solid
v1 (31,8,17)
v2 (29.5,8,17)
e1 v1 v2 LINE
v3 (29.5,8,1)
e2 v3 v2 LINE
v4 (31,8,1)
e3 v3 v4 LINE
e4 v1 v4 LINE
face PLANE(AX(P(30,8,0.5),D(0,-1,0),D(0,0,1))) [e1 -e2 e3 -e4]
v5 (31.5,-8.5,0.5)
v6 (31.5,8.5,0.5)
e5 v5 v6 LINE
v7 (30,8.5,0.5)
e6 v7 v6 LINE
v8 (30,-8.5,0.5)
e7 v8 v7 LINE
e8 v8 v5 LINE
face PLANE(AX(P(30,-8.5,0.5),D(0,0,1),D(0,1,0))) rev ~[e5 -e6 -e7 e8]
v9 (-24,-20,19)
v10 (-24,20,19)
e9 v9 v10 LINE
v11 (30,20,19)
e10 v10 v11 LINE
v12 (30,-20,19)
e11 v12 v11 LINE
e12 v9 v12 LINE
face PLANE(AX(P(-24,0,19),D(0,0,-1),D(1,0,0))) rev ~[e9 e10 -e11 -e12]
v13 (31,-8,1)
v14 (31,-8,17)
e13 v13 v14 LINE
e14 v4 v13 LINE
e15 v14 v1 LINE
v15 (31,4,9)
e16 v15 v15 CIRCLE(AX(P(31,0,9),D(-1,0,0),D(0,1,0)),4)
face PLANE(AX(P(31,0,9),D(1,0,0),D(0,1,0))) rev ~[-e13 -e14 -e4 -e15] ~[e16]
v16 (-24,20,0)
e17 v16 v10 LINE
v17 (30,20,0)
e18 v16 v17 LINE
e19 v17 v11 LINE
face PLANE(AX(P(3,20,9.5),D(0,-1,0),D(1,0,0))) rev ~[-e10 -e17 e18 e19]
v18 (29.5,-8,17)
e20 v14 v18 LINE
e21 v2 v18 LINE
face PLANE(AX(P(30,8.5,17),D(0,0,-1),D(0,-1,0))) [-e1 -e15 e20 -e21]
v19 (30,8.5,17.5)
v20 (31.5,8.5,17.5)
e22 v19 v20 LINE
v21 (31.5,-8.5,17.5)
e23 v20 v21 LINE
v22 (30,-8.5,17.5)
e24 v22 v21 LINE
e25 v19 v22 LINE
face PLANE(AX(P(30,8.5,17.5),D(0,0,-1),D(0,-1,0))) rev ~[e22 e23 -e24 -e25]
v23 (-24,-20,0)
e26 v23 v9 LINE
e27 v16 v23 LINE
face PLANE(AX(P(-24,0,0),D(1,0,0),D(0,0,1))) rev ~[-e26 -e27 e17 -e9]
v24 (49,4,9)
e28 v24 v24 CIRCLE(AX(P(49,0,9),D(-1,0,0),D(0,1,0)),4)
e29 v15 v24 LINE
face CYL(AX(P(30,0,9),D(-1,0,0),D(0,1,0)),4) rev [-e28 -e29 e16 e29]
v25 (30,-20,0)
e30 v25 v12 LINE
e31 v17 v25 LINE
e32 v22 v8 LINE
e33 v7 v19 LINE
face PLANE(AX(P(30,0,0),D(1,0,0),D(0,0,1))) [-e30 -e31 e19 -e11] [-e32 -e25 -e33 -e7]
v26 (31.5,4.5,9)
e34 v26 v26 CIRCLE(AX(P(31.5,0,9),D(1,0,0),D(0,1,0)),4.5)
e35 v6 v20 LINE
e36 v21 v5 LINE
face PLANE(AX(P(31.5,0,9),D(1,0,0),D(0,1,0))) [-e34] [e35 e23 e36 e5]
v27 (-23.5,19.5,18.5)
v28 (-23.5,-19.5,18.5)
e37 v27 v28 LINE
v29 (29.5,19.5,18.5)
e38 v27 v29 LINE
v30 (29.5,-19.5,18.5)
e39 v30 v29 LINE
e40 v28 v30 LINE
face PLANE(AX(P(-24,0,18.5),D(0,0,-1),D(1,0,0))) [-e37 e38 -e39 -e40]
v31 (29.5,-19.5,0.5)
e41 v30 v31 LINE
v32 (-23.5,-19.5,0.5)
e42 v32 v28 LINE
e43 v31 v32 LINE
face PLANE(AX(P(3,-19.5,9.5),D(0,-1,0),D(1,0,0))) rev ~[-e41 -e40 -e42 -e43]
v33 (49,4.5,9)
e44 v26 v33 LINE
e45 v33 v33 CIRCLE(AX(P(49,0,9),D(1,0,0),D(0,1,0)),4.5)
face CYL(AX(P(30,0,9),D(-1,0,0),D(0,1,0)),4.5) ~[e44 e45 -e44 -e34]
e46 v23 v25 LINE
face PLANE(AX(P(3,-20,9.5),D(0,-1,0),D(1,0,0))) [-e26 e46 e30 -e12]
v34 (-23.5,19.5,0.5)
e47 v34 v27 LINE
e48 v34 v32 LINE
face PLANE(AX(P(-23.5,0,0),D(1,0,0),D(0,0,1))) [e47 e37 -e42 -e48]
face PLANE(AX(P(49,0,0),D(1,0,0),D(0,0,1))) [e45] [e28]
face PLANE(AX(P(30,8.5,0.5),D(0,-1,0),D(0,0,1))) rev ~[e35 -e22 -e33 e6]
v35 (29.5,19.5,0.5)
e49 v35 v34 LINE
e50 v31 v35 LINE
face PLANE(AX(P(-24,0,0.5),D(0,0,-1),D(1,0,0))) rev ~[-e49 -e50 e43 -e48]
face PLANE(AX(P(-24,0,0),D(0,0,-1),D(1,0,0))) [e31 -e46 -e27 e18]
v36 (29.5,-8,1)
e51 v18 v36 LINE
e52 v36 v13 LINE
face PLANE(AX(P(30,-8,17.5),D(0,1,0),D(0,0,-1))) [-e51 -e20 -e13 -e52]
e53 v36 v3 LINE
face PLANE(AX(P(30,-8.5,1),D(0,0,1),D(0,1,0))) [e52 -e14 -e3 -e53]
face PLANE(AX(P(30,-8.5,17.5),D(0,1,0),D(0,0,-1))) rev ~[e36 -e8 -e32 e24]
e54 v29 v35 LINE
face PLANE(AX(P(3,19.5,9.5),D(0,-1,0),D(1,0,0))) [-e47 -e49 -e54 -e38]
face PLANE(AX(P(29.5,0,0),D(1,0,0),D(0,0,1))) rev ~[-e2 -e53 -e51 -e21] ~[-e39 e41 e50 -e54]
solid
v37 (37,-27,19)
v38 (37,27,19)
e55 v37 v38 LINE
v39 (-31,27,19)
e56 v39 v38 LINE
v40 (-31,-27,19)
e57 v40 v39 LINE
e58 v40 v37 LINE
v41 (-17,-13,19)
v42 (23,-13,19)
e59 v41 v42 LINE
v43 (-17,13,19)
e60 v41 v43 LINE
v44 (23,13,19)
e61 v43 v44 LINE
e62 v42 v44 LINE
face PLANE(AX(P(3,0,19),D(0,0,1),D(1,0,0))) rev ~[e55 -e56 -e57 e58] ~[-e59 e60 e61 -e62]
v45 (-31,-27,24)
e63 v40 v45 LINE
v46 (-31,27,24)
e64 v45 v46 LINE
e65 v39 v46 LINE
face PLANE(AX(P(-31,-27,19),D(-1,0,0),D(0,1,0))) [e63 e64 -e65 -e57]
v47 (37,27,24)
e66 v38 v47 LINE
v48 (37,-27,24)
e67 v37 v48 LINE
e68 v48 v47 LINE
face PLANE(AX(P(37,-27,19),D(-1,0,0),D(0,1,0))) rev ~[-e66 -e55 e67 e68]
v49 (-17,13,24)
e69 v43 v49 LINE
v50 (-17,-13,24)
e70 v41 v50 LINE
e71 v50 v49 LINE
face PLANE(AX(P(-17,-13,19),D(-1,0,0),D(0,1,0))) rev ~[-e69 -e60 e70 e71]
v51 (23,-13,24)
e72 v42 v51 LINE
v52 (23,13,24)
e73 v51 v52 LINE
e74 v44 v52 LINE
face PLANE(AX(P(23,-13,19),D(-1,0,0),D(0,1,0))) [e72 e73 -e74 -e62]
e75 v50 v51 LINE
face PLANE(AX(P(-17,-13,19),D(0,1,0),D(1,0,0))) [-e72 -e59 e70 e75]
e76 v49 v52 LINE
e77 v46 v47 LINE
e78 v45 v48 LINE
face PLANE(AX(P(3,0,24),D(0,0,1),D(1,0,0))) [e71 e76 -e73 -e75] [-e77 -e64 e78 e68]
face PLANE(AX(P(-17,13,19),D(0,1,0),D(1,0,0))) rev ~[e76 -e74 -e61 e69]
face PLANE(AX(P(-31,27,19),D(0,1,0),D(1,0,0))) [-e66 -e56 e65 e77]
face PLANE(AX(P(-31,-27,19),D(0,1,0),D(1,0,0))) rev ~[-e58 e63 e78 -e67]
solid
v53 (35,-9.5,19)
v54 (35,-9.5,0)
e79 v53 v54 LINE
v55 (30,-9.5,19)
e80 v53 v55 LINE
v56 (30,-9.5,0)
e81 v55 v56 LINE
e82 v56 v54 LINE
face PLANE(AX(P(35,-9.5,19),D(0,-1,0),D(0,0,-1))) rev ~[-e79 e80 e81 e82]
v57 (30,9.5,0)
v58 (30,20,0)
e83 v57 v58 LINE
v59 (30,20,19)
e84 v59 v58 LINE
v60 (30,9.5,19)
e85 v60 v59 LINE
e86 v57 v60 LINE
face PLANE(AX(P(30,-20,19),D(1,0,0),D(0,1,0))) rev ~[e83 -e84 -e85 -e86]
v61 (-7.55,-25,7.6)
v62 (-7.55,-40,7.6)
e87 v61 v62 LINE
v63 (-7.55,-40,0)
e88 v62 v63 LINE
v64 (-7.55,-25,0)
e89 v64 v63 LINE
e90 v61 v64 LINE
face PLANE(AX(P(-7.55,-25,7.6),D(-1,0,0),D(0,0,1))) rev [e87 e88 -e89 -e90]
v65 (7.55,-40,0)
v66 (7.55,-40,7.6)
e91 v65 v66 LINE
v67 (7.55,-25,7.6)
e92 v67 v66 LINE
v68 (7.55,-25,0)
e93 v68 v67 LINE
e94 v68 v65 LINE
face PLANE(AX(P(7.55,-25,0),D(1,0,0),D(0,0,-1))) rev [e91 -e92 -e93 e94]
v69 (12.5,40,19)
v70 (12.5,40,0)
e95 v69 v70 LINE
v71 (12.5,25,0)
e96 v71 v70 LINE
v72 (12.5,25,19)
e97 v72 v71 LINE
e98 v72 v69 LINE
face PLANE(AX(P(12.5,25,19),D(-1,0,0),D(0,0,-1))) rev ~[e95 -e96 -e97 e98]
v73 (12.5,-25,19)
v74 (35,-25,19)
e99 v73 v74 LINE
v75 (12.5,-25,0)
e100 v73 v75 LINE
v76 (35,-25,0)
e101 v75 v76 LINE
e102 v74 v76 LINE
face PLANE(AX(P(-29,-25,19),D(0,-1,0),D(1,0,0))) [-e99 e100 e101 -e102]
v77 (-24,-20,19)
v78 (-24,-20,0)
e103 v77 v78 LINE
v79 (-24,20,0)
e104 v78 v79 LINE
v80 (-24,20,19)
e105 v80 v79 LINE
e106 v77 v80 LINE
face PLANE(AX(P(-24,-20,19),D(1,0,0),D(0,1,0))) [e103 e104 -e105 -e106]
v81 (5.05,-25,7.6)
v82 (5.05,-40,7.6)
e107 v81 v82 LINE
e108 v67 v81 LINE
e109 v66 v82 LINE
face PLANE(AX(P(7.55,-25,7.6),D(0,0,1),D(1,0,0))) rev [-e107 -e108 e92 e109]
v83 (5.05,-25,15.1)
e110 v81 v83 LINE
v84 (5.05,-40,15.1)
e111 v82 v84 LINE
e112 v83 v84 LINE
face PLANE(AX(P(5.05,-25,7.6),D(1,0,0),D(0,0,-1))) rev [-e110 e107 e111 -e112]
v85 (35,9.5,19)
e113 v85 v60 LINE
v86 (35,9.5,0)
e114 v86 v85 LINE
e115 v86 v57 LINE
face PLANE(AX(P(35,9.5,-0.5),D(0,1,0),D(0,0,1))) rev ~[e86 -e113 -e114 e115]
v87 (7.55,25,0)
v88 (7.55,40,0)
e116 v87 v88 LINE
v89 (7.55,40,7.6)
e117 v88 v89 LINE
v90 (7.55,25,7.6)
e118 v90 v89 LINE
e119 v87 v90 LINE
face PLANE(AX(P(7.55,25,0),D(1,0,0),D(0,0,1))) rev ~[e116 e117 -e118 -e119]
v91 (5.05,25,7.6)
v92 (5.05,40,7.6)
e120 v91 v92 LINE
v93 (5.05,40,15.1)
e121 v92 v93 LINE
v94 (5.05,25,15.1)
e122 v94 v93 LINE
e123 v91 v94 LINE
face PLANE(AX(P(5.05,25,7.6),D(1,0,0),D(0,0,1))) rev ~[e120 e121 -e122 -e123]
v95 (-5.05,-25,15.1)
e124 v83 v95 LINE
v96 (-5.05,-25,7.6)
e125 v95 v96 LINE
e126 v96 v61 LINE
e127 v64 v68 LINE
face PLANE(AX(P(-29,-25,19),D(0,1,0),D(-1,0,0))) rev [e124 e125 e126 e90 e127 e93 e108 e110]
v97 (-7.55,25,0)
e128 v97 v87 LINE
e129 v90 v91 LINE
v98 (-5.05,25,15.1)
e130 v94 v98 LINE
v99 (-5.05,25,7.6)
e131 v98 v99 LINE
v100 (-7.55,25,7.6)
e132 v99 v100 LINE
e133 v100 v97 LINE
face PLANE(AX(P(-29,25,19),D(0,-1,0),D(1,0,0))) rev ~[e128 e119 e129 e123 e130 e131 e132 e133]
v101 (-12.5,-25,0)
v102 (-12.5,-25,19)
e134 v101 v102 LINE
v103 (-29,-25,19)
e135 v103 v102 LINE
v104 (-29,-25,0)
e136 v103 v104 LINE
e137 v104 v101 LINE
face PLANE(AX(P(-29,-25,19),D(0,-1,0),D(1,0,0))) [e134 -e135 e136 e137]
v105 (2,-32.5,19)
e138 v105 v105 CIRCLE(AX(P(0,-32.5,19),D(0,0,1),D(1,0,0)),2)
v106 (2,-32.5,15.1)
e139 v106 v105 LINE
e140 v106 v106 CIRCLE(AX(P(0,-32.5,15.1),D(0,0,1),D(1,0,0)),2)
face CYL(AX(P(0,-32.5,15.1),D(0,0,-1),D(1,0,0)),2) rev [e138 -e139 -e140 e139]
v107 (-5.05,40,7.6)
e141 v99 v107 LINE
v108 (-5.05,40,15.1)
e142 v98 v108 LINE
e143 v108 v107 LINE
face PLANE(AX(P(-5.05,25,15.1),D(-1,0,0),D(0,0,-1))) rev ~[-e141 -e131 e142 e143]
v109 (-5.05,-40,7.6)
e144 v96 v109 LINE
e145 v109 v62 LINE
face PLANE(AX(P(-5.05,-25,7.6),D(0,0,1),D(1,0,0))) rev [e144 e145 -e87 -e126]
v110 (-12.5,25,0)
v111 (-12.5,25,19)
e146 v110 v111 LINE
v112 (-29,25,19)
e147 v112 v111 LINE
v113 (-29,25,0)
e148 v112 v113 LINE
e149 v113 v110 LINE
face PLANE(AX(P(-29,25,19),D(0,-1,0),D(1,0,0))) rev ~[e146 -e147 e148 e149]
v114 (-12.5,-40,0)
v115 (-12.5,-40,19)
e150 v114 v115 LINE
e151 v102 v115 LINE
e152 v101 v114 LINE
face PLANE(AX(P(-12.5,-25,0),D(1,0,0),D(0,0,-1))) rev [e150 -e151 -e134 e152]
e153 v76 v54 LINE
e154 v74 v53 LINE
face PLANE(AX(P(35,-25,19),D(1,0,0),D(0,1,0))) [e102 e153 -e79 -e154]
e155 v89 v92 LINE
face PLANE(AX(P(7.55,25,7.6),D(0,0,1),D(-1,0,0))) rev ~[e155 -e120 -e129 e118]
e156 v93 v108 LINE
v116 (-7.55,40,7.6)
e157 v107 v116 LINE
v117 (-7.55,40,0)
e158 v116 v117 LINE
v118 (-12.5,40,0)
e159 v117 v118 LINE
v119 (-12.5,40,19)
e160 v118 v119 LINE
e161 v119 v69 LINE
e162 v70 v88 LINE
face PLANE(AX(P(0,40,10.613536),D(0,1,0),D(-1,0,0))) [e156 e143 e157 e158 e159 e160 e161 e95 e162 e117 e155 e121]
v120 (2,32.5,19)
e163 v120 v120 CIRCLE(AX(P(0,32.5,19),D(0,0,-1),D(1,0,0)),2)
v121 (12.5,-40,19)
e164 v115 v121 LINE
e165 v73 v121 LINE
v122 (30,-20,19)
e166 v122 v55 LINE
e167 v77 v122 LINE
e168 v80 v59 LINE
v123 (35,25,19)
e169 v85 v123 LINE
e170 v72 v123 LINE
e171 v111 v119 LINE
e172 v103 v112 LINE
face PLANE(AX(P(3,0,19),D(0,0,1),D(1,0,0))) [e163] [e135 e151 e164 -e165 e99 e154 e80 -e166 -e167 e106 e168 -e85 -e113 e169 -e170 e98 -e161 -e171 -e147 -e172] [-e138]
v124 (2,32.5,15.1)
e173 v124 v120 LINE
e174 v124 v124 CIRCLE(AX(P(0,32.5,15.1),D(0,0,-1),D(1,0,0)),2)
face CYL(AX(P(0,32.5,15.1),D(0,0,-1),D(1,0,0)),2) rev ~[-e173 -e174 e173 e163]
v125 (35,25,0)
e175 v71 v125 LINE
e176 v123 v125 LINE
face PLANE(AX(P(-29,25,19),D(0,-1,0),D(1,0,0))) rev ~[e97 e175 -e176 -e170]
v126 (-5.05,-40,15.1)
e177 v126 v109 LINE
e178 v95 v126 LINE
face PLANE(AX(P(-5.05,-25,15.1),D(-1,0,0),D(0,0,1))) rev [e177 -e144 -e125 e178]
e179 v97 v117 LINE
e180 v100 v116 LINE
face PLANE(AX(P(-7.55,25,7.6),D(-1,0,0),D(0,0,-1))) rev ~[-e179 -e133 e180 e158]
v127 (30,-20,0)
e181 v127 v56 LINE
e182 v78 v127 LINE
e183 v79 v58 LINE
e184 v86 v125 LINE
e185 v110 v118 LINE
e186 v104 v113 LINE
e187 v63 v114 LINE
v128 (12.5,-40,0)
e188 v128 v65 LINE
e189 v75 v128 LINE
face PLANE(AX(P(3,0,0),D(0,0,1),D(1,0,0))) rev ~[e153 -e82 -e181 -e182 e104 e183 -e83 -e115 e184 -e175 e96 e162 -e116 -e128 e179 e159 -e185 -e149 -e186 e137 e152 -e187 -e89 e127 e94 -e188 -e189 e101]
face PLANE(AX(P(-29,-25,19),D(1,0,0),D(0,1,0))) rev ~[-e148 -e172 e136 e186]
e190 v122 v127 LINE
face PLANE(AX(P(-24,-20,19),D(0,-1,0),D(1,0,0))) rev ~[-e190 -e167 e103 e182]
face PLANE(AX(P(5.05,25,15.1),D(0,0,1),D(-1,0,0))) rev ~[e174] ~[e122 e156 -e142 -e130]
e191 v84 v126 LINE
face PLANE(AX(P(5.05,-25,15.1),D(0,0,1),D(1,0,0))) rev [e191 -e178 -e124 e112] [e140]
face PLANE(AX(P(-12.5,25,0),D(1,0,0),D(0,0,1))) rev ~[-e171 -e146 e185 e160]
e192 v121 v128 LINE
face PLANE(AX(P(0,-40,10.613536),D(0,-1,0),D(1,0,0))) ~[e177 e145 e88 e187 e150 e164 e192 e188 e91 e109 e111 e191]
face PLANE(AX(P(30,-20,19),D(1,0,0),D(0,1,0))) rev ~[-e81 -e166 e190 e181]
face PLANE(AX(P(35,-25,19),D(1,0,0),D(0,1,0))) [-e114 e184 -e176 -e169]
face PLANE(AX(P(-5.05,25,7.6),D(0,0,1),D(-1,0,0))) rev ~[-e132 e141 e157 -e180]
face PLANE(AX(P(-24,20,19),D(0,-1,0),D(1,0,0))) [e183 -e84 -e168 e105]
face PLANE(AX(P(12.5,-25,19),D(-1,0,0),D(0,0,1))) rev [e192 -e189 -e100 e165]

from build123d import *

# Parameters (mm, degrees)
F0_W      = 54
F0_H      = 19
F1_DEPTH  = 20
F2_R      = 4.5
F3_DEPTH  = 1.5
F4_DEPTH  = 19
F5_T      = -0.5
F6_W      = 64
F6_H      = 50
F6_W_2    = 54
F6_H_2    = 40
F7_DEPTH  = 19
F9_DEPTH  = 25
F10_W     = 68
F10_H     = 54
F10_W_2   = 64
F10_H_2   = 50
F11_DEPTH = 5
F10_W_3   = 54
F10_H_3   = 40
F10_W_4   = 40
F10_H_4   = 26
F14_DEPTH = 15
F15_R     = 2
F16_DEPTH = 8.901


with BuildPart() as f1:
    # F0 (on Front) → F1 (new body, symmetric)
    with BuildSketch(Plane.XZ):
        with Locations((3, 9.5)):
            Rectangle(F0_W, F0_H)
    extrude(amount=F1_DEPTH, both=True)

    # F2 (on face) → F3 (join)
    with BuildSketch(Plane.YZ.offset(30)):
        Polygon((-8.5, 17.5), (-8.5, 0.5), (0, 0.5), (8.5, 0.5), (8.5, 17.5), (0, 17.5), align=None)
        with Locations((0, 9)):
            Circle(F2_R, mode=Mode.SUBTRACT)
    extrude(amount=F3_DEPTH)

    # F4 (add): a face of the model
    f4_faces = [f1.faces().sort_by_distance(p)[0] for p in [
        (30, 0, 9),
    ]]
    extrude(f4_faces, amount=F4_DEPTH)

    # F5
    f5_openings = [f1.faces().sort_by_distance(p)[0] for p in [
        (49, 0, 9),
    ]]
    offset(amount=F5_T, openings=f5_openings, kind=Kind.INTERSECTION)


with BuildPart() as f7:
    # F6 (on face) → F7 (new body, through all)
    with BuildSketch(Plane.XY.offset(19)):
        with Locations((3, 0)):
            Rectangle(F6_W, F6_H)
        with Locations((3, 0)):
            Rectangle(F6_W_2, F6_H_2, mode=Mode.SUBTRACT)
    extrude(amount=-F7_DEPTH)

    # F8 (on face) → F9 (cut)
    with BuildSketch(Plane.YZ.offset(35)):
        Polygon((0, -0.5), (9.5, -0.5), (9.5, 19), (0, 19), (-9.5, 19), (-9.5, -0.5), align=None)
    extrude(amount=-F9_DEPTH, mode=Mode.SUBTRACT)

    # F12 (on face) → F14 (join)
    with BuildSketch(Plane(origin=(0, 25, 0), x_dir=(-1, 0, 0), z_dir=(0, 1, 0))):
        Polygon((-12.5, 0), (-7.55, 0), (-7.55, 7.6), (-5.05, 7.6), (-5.05, 15.1), (0, 15.1), (5.05, 15.1), (5.05, 7.6), (7.55, 7.6), (7.55, 0), (12.5, 0), (12.5, 19), (0, 19), (-12.5, 19), align=None)
    extrude(amount=F14_DEPTH)

    # F15 (on face) → F16 (cut, through all)
    with BuildSketch(Plane(origin=(0, 0, 15.1), x_dir=(1, 0, 0), z_dir=(0, 0, -1))):
        with Locations((0, -32.5)):
            Circle(F15_R)
    extrude(amount=-F16_DEPTH, mode=Mode.SUBTRACT)

    # F17: F7 across plane


with BuildPart() as f11:
    # F10 (on face) → F11 (new body)
    with BuildSketch(Plane.XY.offset(19)):
        with Locations((3, 0)):
            Rectangle(F10_W, F10_H)
        with Locations((3, 0)):
            Rectangle(F10_W_2, F10_H_2, mode=Mode.SUBTRACT)
    extrude(amount=F11_DEPTH)



with BuildPart() as f11b:
    # F10 (on face) → F11, piece 2 (new body)
    with BuildSketch(Plane.XY.offset(19)):
        with Locations((3, 0)):
            Rectangle(F10_W_3, F10_H_3)
        with Locations((3, 0)):
            Rectangle(F10_W_4, F10_H_4, mode=Mode.SUBTRACT)
    extrude(amount=F11_DEPTH)


with BuildPart() as f11_1:
    add(f11.part)

    add(f11b.part)  # F11#3 merges F11b
    # F6 (on face) → F11, piece 3 (join)
    with BuildSketch(Plane.XY.offset(19)):
        with Locations((3, 0)):
            Rectangle(F6_W, F6_H)
        with Locations((3, 0)):
            Rectangle(F6_W_2, F6_H_2, mode=Mode.SUBTRACT)
    extrude(amount=F11_DEPTH)


with BuildPart() as f7_1:
    add(f7.part)
    add(f7.part.mirror(Plane.XZ))


solid = Compound([f1.part, f11_1.part, f7_1.part])
